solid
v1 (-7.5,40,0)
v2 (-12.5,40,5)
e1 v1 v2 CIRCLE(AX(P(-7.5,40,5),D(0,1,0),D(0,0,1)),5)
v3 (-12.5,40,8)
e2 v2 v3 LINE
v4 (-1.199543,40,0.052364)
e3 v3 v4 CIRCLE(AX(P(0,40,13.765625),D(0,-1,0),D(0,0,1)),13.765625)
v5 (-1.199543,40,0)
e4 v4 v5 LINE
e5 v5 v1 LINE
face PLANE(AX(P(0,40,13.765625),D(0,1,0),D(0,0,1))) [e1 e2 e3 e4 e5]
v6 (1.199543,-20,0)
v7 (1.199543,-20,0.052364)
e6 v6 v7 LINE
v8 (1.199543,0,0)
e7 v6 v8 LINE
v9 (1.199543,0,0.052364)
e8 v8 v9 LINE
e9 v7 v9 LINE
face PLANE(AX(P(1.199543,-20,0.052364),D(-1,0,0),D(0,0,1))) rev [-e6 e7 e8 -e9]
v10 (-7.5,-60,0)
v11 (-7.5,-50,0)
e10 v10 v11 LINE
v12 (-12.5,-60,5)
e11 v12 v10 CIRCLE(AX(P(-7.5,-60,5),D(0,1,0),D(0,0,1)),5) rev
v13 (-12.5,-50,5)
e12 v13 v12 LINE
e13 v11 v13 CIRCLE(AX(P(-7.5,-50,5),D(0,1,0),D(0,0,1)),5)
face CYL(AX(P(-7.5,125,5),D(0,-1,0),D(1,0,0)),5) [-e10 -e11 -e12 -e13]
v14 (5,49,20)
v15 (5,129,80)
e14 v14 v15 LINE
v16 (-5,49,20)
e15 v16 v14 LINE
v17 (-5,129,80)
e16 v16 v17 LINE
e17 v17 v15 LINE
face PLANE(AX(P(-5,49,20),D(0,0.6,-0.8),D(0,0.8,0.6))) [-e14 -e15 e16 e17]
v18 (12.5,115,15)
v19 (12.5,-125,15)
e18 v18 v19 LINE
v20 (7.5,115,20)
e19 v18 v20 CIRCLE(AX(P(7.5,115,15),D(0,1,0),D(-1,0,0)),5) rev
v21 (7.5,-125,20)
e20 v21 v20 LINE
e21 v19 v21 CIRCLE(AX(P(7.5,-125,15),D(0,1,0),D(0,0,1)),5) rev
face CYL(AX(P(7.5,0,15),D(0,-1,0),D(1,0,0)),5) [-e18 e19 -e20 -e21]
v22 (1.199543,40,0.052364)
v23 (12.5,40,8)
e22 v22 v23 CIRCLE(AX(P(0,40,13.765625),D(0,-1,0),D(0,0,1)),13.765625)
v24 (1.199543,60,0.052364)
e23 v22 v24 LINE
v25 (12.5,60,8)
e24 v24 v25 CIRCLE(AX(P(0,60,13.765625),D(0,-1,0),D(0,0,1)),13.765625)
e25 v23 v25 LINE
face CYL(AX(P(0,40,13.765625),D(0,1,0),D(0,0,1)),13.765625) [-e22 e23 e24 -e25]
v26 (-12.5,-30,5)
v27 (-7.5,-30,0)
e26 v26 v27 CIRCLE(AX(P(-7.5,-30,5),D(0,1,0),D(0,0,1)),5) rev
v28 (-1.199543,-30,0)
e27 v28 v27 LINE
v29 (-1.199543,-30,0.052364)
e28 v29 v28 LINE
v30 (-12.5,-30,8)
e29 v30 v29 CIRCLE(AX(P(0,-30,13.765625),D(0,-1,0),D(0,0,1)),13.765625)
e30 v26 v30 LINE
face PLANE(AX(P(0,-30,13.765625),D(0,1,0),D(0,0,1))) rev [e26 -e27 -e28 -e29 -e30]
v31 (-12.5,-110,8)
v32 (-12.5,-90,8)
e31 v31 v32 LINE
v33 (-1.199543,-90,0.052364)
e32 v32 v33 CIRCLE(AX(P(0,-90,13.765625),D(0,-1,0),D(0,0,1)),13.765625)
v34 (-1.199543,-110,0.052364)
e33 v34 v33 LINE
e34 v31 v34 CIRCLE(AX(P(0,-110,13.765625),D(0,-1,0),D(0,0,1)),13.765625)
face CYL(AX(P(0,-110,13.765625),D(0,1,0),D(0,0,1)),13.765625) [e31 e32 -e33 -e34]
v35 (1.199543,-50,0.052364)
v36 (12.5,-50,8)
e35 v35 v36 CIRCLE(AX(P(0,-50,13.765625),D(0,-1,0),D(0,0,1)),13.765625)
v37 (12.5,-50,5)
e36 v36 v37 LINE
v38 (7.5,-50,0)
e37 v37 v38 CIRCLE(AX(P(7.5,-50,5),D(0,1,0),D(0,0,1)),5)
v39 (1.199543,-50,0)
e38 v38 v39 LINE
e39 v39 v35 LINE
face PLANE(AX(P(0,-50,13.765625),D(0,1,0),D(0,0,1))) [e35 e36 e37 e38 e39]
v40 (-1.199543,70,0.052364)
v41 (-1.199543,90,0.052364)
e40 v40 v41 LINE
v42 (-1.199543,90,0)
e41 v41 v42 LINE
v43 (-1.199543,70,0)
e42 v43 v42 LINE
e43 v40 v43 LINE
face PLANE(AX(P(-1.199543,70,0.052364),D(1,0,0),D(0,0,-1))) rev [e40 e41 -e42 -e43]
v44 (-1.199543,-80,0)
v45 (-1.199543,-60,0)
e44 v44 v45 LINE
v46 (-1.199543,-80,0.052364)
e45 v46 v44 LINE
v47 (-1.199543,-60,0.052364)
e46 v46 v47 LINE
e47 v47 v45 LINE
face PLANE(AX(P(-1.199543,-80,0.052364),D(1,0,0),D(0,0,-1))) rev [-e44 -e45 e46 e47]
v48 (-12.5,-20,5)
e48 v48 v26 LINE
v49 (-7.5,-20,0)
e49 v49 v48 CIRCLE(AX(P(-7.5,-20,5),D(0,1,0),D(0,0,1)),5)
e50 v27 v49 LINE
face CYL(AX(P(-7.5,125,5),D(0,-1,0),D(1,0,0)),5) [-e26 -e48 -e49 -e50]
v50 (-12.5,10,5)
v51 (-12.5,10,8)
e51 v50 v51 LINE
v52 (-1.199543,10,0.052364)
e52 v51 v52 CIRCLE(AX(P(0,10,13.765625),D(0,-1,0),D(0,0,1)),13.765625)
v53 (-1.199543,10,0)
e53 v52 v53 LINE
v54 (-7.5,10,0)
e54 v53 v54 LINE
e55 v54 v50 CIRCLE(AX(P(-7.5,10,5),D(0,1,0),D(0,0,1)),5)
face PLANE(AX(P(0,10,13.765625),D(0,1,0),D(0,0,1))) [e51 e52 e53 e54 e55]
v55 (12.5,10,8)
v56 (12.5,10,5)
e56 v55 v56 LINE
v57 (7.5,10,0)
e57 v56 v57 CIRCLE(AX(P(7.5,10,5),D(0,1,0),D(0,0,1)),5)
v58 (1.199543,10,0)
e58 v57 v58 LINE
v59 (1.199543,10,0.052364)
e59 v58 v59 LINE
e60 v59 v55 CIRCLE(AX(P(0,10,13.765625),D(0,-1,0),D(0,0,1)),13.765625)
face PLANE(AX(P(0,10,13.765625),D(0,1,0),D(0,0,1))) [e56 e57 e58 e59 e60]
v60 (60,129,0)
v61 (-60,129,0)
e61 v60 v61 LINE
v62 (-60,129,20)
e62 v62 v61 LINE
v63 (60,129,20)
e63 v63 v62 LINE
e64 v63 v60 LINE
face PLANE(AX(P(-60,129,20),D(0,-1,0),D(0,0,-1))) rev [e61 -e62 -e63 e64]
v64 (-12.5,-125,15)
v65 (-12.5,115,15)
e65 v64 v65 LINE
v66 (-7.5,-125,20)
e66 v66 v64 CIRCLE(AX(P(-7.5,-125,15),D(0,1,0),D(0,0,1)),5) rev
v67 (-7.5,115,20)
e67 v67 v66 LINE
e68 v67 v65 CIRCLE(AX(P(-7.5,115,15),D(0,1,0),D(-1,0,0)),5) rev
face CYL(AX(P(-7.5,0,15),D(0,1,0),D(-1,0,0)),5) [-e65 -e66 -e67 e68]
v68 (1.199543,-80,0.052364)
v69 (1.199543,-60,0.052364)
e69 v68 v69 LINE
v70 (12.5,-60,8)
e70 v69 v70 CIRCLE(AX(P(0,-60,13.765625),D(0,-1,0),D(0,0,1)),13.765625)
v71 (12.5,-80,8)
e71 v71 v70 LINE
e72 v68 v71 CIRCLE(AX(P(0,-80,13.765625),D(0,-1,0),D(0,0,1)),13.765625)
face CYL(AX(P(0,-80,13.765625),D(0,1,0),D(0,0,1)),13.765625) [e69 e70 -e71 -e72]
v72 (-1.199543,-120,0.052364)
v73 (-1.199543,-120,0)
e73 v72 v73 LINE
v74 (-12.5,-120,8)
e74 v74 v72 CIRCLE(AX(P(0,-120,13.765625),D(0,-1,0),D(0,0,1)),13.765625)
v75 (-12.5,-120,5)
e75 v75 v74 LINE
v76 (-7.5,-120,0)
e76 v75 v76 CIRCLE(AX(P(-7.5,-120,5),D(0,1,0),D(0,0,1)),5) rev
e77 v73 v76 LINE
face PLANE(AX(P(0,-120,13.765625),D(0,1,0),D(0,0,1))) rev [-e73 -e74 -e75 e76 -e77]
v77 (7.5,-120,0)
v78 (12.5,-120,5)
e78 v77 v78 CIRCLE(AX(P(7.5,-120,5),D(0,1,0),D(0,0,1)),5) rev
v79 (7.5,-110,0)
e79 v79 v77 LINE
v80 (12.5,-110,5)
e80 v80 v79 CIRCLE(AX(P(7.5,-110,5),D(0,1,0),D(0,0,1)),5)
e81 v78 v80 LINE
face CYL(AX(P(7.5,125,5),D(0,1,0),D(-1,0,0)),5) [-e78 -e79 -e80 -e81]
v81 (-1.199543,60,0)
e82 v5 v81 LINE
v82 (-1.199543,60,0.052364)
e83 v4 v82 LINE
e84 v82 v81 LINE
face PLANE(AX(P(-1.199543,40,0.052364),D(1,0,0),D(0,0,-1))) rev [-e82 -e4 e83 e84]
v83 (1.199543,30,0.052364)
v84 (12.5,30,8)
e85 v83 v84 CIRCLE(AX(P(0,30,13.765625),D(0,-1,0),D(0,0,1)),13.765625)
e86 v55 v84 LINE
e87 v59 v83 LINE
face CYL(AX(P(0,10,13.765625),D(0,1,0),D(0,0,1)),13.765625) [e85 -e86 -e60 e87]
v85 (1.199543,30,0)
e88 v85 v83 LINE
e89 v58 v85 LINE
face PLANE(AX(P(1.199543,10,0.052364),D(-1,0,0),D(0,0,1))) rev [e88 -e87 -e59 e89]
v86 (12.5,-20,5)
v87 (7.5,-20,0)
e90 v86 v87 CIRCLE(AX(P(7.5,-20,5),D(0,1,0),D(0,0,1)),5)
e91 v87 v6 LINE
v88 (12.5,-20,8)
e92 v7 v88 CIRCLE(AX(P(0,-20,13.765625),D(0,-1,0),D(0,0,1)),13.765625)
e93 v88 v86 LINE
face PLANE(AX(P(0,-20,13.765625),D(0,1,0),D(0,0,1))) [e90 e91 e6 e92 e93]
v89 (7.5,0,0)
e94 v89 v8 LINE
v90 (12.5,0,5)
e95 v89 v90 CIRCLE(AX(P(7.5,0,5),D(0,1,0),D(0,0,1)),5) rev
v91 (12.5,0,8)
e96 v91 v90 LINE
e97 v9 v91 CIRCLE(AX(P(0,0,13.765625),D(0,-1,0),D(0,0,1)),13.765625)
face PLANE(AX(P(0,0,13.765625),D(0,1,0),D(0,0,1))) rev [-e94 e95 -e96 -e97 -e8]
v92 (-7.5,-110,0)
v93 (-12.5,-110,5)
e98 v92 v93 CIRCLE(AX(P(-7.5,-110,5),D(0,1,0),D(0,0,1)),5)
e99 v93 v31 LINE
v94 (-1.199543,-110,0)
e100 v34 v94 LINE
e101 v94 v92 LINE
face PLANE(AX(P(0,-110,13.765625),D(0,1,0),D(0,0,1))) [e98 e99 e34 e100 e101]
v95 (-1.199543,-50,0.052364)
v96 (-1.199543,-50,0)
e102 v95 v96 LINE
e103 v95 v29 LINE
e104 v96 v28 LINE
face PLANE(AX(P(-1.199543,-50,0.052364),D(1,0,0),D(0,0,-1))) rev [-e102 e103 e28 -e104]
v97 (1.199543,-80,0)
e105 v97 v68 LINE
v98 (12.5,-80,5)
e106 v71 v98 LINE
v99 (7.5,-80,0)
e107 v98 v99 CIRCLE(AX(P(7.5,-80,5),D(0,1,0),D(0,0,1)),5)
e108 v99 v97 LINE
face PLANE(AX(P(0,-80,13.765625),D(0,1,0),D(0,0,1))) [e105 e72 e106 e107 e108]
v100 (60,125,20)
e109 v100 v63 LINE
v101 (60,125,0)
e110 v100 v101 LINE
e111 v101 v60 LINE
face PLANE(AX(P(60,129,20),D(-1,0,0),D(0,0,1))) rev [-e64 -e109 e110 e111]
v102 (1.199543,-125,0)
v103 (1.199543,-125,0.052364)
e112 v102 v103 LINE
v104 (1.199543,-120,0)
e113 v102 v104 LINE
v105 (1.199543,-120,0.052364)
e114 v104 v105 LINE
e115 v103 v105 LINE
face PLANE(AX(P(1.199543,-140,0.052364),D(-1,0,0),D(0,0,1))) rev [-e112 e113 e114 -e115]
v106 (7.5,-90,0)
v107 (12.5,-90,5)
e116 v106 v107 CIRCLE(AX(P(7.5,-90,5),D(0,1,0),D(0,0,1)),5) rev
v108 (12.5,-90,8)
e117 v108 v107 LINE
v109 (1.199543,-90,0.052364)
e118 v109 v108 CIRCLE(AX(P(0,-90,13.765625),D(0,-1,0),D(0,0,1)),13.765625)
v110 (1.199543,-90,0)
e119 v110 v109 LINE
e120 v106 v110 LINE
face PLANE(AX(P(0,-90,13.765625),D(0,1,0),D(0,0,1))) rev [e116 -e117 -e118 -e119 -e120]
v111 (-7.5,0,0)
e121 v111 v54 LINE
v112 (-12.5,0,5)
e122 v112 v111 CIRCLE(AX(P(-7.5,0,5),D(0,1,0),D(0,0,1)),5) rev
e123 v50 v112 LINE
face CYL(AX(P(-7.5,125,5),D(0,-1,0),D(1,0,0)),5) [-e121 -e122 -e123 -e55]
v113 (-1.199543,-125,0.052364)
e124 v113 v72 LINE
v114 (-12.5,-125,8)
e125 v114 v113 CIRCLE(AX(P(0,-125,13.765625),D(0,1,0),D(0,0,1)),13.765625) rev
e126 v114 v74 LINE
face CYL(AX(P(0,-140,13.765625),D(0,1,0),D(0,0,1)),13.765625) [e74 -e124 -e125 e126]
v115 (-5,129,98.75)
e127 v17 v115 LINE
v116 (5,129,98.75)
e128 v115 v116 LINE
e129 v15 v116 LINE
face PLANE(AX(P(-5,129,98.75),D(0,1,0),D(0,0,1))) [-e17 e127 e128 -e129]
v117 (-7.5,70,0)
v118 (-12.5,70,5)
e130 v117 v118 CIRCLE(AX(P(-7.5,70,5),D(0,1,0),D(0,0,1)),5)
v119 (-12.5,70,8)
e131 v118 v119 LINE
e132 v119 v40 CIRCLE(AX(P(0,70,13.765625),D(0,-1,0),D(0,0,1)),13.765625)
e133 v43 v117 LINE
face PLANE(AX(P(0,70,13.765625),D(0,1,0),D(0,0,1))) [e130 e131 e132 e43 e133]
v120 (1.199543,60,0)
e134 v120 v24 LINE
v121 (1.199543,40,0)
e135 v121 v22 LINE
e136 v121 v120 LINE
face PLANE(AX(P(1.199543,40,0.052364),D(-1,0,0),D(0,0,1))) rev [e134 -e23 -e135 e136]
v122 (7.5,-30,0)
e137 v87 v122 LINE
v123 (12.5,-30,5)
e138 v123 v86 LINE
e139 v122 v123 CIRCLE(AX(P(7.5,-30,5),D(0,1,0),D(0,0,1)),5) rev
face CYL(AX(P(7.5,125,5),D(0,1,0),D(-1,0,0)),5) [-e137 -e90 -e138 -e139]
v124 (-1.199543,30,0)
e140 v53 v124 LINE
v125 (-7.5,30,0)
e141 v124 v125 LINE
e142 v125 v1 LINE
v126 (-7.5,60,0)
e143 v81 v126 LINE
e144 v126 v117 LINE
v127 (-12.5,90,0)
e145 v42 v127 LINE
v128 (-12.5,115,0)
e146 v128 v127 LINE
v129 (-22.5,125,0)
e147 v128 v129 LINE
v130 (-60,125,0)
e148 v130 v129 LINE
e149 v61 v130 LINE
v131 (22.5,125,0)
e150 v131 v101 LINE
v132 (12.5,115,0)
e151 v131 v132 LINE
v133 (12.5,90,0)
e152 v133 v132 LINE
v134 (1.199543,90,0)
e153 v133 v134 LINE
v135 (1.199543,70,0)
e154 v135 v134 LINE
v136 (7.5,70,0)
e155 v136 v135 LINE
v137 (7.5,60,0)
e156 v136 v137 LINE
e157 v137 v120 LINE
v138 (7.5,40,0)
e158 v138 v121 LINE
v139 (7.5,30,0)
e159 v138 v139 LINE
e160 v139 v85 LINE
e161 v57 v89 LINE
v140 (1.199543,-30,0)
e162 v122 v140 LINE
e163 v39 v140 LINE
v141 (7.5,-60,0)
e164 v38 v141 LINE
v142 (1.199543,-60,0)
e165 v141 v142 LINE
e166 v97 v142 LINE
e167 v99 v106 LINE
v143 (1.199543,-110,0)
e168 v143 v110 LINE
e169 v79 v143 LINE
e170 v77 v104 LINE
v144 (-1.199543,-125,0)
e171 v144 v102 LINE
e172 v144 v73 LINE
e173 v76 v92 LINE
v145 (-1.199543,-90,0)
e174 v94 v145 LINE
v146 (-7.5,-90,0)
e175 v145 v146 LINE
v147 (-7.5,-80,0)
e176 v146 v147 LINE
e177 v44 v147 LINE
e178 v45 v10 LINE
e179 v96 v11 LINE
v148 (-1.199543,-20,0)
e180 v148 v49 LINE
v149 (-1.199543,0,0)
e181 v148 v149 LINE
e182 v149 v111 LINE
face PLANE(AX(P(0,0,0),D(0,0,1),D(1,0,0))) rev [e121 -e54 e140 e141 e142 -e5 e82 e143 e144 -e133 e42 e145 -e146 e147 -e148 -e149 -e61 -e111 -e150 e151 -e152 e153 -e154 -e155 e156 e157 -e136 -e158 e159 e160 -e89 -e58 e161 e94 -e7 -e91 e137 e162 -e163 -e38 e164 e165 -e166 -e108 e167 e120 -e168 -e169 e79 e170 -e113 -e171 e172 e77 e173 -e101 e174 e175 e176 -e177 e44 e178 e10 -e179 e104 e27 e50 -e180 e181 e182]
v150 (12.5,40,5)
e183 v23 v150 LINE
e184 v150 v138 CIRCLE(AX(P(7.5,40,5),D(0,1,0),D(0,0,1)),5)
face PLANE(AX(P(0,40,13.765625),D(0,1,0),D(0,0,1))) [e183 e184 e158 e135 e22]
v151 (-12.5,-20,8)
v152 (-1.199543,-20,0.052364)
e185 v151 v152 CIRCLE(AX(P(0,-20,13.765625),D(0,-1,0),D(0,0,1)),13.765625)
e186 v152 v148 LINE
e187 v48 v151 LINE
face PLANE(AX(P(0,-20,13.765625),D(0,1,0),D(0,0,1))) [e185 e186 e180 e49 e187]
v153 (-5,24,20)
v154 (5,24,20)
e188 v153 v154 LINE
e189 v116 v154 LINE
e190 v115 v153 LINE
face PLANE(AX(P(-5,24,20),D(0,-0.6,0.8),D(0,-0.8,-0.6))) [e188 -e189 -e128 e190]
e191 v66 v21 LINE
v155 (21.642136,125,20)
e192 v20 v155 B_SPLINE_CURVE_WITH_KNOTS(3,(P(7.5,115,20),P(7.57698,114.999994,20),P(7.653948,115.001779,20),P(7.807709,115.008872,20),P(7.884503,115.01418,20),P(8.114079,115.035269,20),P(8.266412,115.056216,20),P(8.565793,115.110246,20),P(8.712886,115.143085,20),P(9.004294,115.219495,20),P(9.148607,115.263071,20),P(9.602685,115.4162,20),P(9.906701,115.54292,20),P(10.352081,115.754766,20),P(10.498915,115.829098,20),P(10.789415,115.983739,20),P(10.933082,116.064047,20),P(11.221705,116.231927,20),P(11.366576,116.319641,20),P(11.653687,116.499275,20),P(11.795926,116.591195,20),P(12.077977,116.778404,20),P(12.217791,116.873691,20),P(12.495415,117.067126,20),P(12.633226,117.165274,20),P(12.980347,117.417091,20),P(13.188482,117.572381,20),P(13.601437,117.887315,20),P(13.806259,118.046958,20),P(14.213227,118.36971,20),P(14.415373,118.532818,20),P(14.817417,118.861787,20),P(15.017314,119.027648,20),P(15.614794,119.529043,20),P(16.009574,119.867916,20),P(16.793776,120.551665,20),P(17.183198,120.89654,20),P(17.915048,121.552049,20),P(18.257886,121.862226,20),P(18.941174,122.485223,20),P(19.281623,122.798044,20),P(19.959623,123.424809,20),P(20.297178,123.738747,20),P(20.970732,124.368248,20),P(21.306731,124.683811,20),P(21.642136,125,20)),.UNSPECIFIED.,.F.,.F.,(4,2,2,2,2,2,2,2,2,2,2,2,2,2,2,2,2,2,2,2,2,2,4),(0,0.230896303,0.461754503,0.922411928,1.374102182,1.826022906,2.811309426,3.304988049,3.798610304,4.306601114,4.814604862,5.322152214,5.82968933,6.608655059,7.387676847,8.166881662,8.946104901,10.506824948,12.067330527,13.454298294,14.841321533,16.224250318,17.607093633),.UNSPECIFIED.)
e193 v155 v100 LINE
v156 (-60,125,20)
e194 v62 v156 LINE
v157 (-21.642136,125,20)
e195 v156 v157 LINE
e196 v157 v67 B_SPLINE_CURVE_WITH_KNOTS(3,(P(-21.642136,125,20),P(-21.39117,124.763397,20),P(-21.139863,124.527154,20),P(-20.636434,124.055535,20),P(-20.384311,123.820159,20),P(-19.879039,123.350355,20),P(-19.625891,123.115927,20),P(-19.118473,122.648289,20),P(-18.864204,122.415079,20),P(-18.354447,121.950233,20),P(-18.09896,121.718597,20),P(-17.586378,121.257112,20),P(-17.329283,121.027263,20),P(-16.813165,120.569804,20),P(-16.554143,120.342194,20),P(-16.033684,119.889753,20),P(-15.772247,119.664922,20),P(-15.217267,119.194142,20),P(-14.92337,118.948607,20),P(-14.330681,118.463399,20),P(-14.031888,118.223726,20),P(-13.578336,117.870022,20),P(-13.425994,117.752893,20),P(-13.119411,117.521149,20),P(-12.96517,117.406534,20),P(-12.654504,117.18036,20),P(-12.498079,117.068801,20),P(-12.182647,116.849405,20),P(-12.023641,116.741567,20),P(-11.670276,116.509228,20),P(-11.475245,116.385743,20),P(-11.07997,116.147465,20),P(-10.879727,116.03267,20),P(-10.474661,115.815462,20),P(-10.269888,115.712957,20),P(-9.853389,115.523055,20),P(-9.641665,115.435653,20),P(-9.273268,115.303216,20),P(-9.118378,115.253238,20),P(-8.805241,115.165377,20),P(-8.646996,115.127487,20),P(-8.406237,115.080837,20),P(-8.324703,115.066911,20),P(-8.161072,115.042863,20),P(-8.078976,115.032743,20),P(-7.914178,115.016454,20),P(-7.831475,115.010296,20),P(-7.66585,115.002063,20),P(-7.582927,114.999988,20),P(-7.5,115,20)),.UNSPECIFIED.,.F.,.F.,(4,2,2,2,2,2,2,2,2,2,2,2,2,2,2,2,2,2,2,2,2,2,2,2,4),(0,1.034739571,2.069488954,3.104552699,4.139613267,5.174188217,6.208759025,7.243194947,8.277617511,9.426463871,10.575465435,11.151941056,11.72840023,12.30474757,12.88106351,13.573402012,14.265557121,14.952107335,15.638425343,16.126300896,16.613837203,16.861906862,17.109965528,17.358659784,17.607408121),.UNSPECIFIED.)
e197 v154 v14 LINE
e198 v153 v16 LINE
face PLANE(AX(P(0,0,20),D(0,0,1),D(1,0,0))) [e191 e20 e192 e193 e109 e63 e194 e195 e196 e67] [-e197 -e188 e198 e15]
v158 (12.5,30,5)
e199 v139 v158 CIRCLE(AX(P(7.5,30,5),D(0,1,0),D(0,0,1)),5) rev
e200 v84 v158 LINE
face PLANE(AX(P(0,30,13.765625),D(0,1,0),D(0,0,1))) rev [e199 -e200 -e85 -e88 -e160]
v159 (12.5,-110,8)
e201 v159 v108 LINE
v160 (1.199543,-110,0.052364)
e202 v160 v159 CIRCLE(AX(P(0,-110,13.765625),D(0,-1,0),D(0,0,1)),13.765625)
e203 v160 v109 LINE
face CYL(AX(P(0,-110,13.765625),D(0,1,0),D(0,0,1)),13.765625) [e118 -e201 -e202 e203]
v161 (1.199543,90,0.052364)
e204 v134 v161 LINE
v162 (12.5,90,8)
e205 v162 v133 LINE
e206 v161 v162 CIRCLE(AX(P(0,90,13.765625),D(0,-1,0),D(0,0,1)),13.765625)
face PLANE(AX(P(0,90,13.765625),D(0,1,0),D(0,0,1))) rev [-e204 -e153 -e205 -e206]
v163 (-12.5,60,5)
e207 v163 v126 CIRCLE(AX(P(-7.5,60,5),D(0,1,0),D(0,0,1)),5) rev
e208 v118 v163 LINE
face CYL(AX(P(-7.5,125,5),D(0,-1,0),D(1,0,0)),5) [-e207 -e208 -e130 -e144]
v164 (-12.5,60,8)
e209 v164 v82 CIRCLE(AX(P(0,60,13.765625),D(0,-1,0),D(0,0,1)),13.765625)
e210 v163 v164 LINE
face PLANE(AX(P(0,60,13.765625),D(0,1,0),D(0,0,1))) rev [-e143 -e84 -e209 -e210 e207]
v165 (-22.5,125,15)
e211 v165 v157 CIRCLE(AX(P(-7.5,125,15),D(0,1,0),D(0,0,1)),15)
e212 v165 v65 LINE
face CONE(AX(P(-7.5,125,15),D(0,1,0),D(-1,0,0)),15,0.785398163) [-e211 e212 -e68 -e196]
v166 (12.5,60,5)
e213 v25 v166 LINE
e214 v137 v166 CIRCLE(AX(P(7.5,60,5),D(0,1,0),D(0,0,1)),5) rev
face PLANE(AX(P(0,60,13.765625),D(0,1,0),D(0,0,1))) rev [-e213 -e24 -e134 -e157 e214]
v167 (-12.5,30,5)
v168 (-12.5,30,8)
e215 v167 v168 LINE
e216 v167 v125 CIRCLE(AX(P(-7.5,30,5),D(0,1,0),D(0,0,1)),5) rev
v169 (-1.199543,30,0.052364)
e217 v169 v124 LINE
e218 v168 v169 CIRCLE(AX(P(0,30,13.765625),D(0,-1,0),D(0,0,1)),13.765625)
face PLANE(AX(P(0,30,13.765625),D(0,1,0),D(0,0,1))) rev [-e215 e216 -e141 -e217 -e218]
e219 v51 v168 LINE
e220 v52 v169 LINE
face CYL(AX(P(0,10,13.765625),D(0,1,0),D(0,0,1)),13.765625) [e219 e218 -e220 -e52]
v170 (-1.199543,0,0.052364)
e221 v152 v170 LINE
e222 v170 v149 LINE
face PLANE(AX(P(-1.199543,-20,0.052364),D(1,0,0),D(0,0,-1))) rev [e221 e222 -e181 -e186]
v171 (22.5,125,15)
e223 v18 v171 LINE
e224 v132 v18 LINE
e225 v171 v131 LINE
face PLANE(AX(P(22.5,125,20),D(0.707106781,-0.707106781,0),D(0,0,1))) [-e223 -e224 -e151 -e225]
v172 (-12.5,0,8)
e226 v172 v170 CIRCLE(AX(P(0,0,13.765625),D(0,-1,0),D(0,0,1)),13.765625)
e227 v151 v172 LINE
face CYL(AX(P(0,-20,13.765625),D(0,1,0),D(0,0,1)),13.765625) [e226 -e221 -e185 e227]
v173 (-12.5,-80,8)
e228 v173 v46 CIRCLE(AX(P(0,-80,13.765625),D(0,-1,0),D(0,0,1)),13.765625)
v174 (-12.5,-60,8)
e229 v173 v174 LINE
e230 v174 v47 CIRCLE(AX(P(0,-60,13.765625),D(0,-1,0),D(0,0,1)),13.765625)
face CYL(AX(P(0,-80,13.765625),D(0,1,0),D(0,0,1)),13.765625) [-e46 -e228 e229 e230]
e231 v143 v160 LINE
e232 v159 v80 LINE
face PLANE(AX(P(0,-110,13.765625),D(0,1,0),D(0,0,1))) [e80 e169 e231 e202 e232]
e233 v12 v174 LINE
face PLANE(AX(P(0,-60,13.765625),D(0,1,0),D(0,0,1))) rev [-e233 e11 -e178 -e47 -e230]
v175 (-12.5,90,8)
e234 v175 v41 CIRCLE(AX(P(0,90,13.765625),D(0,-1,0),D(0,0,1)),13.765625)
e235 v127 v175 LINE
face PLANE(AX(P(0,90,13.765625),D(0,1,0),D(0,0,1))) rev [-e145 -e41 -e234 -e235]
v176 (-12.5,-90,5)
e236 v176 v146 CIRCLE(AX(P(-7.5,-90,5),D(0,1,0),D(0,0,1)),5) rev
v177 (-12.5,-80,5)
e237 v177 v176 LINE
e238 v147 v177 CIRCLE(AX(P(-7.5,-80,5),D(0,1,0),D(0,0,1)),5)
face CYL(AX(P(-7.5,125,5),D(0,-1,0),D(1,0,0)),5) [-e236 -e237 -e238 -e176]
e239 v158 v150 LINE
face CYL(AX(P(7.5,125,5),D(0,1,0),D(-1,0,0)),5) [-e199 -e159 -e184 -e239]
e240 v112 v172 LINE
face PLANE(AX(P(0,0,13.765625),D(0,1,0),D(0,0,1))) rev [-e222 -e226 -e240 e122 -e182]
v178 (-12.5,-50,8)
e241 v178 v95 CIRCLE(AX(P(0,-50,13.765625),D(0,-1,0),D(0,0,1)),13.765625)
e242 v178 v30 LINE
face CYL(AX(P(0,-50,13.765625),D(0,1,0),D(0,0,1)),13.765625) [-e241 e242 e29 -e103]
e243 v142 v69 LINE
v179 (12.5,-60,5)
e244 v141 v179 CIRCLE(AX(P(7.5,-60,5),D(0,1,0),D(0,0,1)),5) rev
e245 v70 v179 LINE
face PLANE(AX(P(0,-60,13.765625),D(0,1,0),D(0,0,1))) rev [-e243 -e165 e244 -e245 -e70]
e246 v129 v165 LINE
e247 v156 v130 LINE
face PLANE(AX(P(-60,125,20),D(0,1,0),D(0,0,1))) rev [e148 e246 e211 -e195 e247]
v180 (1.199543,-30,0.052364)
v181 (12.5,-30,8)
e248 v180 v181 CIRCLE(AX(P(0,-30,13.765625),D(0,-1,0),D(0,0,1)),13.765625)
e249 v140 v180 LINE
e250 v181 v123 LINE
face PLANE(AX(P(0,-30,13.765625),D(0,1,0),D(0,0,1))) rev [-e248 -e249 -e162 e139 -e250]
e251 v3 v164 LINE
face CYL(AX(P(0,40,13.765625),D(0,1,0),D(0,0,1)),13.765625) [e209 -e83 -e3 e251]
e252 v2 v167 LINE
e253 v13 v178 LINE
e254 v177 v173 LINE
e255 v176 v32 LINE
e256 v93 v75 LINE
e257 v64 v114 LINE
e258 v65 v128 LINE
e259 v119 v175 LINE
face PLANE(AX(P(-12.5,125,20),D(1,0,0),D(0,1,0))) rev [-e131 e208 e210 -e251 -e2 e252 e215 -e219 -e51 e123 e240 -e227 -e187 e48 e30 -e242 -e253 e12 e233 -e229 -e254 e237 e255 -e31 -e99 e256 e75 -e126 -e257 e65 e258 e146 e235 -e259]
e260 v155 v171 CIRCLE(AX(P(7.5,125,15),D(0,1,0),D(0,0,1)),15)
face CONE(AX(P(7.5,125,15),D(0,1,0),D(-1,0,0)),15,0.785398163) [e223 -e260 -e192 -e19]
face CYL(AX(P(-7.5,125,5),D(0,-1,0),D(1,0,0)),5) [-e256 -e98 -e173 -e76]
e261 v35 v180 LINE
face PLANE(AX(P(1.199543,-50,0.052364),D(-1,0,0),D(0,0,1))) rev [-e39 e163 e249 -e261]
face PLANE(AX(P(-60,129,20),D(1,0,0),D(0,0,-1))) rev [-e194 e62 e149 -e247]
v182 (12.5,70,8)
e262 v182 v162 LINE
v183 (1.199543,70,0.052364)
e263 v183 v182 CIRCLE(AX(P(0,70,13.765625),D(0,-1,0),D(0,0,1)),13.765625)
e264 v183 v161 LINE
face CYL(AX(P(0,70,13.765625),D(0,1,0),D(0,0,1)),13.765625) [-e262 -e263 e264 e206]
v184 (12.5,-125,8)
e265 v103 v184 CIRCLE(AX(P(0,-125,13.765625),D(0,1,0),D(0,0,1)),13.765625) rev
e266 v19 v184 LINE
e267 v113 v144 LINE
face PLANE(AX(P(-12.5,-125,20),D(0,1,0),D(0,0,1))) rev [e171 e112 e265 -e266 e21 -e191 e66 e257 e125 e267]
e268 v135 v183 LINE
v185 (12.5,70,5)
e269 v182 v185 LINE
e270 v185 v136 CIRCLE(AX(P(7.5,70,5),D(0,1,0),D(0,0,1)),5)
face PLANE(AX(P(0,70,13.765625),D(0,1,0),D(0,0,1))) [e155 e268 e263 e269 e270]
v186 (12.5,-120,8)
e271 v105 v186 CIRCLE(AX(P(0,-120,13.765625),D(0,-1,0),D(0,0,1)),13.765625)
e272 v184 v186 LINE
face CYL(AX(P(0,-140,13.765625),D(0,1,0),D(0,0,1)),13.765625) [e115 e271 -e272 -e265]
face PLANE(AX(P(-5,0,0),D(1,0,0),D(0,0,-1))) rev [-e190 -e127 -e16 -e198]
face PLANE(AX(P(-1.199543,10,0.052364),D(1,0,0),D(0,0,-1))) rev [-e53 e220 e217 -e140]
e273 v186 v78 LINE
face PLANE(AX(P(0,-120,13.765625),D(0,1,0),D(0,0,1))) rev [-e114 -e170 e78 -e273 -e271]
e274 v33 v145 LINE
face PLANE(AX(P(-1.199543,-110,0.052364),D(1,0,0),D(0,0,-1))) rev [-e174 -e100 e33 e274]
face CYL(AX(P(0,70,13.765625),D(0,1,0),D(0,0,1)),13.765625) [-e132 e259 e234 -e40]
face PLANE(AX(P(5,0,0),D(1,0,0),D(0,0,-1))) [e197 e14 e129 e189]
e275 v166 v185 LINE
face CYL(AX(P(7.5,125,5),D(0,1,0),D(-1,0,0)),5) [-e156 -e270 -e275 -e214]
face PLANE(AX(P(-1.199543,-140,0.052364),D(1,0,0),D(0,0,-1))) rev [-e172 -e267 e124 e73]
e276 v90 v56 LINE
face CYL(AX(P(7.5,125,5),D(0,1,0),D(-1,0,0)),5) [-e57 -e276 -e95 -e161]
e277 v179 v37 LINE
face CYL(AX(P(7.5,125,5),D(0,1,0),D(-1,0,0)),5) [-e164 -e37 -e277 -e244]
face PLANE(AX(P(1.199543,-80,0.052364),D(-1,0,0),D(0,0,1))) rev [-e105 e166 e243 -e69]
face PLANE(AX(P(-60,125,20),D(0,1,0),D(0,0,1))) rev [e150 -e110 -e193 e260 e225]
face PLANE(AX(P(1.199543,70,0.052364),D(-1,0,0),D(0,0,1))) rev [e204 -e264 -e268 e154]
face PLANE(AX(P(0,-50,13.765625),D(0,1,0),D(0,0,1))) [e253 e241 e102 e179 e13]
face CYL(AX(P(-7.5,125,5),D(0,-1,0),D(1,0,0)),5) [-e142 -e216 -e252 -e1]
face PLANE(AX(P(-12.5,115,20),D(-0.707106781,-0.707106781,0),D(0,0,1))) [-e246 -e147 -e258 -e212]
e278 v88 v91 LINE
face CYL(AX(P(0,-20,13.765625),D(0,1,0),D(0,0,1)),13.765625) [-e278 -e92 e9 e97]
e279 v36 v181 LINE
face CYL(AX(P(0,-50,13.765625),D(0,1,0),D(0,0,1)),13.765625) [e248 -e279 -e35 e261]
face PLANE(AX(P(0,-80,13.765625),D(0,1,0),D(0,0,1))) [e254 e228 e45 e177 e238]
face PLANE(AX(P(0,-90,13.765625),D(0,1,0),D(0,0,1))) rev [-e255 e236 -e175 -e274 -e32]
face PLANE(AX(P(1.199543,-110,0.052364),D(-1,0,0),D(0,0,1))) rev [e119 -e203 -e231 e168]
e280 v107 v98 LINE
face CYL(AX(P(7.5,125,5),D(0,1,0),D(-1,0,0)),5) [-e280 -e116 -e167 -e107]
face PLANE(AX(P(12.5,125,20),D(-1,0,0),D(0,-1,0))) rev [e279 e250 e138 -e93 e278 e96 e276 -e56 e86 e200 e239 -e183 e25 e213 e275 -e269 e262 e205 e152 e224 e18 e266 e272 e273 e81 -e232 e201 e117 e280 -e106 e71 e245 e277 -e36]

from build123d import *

# Parameters (mm, degrees)
SKETCH1_W                = 25
SKETCH1_H                = 250
BOSS_EXTRUDE1_DEPTH      = 20
SKETCH2_W                = 120
SKETCH2_H                = 4
BOSS_EXTRUDE2_DEPTH      = 20
CUT_EXTRUDE1_DEPTH       = 20
LPATTERN1_COUNT          = 5
LPATTERN1_PITCH          = 30
LPATTERN1_COUNT_DIR2     = 4
LPATTERN1_PITCH_DIR2     = 30
FILLET1_R                = 5
BOSS_EXTRUDE4_DEPTH      = 5
BOSS_EXTRUDE4_DEPTH_BACK = 5
FILLET2_R                = 5
CHAMFER1_SIZE            = 10


with BuildPart() as part:
    # Sketch1 → Boss-Extrude1 (new body)
    with BuildSketch(Plane.XY):
        Rectangle(SKETCH1_W, SKETCH1_H)
    extrude(amount=BOSS_EXTRUDE1_DEPTH)

    # Sketch2 → Boss-Extrude2 (add)
    with BuildSketch(Plane.XY):
        with Locations((0, 127)):
            Rectangle(SKETCH2_W, SKETCH2_H)
    extrude(amount=BOSS_EXTRUDE2_DEPTH)

    # Sketch5 → Cut-Extrude1 (cut)
    with BuildSketch(Plane(origin=(0, 0, 0), x_dir=(1, 0, 0), z_dir=(0, 1, 0))):
        with BuildLine():
            Line((1.199542867, -0.052363953), (1.199542867, 0))
            Line((1.199542867, 0), (12.5, 0))
            Line((12.5, 0), (12.5, -8))
            ThreePointArc((12.5, -8), (7.91900236, -2.505881075), (1.199542867, -0.052363953))
        make_face()
        with BuildLine():
            Line((-1.199542867, -0.052363953), (-1.199542867, 0))
            Line((-1.199542867, 0), (-12.5, 0))
            Line((-12.5, 0), (-12.5, -8))
            ThreePointArc((-12.5, -8), (-7.91900236, -2.505881075), (-1.199542867, -0.052363953))
        make_face()
    cut_extrude1 = extrude(amount=-CUT_EXTRUDE1_DEPTH, mode=Mode.SUBTRACT)

    # LPattern1: Cut-Extrude1 5 × 4
    with Locations(*[Vector(0, -1, 0) * (i * LPATTERN1_PITCH) + Vector(0, 1, 0) * (j * LPATTERN1_PITCH_DIR2) for i in range(LPATTERN1_COUNT) for j in range(LPATTERN1_COUNT_DIR2) if (i, j) != (0, 0)]):
        add(cut_extrude1, mode=Mode.SUBTRACT)

    # Fillet1
    fillet1_edges = [part.edges().sort_by_distance(p)[0] for p in [
        (-12.5, 65, 0),
        (12.5, 65, 0),
        (12.5, 35, 0),
        (12.5, 5, 0),
        (12.5, -25, 0),
        (12.5, -55, 0),
        (12.5, -85, 0),
        (12.5, -115, 0),
        (-12.5, 35, 0),
        (-12.5, 5, 0),
        (-12.5, -25, 0),
        (-12.5, -55, 0),
        (-12.5, -85, 0),
        (-12.5, -115, 0),
    ]]
    fillet(fillet1_edges, radius=FILLET1_R)

    # Sketch6 → Boss-Extrude4 (add, two sides: drawn at the far end of the back side and taken through both)
    with BuildSketch(Plane(origin=(0, 0, 0), x_dir=(0, 0, -1), z_dir=(1, 0, 0)).offset(-BOSS_EXTRUDE4_DEPTH_BACK)):
        Polygon((-20, 49), (-80, 129), (-98.75, 129), (-20, 24), align=None)
    extrude(amount=BOSS_EXTRUDE4_DEPTH + BOSS_EXTRUDE4_DEPTH_BACK)

    # Fillet2
    fillet2_edges = [part.edges().sort_by_distance(p)[0] for p in [
        (12.5, 0, 20),
        (-12.5, 0, 20),
    ]]
    fillet(fillet2_edges, radius=FILLET2_R)

    # Chamfer1
    chamfer1_edges = [part.edges().sort_by_distance(p)[0] for p in [
        (-12.5, 125, 7.5),
        (-11.035533906, 125, 18.535533906),
    ]]
    chamfer(chamfer1_edges, length=CHAMFER1_SIZE)
    chamfer1_2_edges = [part.edges().sort_by_distance(p)[0] for p in [
        (12.5, 125, 7.5),
        (11.035533906, 125, 18.535533906),
    ]]
    chamfer(chamfer1_2_edges, length=CHAMFER1_SIZE)


solid = part.part
